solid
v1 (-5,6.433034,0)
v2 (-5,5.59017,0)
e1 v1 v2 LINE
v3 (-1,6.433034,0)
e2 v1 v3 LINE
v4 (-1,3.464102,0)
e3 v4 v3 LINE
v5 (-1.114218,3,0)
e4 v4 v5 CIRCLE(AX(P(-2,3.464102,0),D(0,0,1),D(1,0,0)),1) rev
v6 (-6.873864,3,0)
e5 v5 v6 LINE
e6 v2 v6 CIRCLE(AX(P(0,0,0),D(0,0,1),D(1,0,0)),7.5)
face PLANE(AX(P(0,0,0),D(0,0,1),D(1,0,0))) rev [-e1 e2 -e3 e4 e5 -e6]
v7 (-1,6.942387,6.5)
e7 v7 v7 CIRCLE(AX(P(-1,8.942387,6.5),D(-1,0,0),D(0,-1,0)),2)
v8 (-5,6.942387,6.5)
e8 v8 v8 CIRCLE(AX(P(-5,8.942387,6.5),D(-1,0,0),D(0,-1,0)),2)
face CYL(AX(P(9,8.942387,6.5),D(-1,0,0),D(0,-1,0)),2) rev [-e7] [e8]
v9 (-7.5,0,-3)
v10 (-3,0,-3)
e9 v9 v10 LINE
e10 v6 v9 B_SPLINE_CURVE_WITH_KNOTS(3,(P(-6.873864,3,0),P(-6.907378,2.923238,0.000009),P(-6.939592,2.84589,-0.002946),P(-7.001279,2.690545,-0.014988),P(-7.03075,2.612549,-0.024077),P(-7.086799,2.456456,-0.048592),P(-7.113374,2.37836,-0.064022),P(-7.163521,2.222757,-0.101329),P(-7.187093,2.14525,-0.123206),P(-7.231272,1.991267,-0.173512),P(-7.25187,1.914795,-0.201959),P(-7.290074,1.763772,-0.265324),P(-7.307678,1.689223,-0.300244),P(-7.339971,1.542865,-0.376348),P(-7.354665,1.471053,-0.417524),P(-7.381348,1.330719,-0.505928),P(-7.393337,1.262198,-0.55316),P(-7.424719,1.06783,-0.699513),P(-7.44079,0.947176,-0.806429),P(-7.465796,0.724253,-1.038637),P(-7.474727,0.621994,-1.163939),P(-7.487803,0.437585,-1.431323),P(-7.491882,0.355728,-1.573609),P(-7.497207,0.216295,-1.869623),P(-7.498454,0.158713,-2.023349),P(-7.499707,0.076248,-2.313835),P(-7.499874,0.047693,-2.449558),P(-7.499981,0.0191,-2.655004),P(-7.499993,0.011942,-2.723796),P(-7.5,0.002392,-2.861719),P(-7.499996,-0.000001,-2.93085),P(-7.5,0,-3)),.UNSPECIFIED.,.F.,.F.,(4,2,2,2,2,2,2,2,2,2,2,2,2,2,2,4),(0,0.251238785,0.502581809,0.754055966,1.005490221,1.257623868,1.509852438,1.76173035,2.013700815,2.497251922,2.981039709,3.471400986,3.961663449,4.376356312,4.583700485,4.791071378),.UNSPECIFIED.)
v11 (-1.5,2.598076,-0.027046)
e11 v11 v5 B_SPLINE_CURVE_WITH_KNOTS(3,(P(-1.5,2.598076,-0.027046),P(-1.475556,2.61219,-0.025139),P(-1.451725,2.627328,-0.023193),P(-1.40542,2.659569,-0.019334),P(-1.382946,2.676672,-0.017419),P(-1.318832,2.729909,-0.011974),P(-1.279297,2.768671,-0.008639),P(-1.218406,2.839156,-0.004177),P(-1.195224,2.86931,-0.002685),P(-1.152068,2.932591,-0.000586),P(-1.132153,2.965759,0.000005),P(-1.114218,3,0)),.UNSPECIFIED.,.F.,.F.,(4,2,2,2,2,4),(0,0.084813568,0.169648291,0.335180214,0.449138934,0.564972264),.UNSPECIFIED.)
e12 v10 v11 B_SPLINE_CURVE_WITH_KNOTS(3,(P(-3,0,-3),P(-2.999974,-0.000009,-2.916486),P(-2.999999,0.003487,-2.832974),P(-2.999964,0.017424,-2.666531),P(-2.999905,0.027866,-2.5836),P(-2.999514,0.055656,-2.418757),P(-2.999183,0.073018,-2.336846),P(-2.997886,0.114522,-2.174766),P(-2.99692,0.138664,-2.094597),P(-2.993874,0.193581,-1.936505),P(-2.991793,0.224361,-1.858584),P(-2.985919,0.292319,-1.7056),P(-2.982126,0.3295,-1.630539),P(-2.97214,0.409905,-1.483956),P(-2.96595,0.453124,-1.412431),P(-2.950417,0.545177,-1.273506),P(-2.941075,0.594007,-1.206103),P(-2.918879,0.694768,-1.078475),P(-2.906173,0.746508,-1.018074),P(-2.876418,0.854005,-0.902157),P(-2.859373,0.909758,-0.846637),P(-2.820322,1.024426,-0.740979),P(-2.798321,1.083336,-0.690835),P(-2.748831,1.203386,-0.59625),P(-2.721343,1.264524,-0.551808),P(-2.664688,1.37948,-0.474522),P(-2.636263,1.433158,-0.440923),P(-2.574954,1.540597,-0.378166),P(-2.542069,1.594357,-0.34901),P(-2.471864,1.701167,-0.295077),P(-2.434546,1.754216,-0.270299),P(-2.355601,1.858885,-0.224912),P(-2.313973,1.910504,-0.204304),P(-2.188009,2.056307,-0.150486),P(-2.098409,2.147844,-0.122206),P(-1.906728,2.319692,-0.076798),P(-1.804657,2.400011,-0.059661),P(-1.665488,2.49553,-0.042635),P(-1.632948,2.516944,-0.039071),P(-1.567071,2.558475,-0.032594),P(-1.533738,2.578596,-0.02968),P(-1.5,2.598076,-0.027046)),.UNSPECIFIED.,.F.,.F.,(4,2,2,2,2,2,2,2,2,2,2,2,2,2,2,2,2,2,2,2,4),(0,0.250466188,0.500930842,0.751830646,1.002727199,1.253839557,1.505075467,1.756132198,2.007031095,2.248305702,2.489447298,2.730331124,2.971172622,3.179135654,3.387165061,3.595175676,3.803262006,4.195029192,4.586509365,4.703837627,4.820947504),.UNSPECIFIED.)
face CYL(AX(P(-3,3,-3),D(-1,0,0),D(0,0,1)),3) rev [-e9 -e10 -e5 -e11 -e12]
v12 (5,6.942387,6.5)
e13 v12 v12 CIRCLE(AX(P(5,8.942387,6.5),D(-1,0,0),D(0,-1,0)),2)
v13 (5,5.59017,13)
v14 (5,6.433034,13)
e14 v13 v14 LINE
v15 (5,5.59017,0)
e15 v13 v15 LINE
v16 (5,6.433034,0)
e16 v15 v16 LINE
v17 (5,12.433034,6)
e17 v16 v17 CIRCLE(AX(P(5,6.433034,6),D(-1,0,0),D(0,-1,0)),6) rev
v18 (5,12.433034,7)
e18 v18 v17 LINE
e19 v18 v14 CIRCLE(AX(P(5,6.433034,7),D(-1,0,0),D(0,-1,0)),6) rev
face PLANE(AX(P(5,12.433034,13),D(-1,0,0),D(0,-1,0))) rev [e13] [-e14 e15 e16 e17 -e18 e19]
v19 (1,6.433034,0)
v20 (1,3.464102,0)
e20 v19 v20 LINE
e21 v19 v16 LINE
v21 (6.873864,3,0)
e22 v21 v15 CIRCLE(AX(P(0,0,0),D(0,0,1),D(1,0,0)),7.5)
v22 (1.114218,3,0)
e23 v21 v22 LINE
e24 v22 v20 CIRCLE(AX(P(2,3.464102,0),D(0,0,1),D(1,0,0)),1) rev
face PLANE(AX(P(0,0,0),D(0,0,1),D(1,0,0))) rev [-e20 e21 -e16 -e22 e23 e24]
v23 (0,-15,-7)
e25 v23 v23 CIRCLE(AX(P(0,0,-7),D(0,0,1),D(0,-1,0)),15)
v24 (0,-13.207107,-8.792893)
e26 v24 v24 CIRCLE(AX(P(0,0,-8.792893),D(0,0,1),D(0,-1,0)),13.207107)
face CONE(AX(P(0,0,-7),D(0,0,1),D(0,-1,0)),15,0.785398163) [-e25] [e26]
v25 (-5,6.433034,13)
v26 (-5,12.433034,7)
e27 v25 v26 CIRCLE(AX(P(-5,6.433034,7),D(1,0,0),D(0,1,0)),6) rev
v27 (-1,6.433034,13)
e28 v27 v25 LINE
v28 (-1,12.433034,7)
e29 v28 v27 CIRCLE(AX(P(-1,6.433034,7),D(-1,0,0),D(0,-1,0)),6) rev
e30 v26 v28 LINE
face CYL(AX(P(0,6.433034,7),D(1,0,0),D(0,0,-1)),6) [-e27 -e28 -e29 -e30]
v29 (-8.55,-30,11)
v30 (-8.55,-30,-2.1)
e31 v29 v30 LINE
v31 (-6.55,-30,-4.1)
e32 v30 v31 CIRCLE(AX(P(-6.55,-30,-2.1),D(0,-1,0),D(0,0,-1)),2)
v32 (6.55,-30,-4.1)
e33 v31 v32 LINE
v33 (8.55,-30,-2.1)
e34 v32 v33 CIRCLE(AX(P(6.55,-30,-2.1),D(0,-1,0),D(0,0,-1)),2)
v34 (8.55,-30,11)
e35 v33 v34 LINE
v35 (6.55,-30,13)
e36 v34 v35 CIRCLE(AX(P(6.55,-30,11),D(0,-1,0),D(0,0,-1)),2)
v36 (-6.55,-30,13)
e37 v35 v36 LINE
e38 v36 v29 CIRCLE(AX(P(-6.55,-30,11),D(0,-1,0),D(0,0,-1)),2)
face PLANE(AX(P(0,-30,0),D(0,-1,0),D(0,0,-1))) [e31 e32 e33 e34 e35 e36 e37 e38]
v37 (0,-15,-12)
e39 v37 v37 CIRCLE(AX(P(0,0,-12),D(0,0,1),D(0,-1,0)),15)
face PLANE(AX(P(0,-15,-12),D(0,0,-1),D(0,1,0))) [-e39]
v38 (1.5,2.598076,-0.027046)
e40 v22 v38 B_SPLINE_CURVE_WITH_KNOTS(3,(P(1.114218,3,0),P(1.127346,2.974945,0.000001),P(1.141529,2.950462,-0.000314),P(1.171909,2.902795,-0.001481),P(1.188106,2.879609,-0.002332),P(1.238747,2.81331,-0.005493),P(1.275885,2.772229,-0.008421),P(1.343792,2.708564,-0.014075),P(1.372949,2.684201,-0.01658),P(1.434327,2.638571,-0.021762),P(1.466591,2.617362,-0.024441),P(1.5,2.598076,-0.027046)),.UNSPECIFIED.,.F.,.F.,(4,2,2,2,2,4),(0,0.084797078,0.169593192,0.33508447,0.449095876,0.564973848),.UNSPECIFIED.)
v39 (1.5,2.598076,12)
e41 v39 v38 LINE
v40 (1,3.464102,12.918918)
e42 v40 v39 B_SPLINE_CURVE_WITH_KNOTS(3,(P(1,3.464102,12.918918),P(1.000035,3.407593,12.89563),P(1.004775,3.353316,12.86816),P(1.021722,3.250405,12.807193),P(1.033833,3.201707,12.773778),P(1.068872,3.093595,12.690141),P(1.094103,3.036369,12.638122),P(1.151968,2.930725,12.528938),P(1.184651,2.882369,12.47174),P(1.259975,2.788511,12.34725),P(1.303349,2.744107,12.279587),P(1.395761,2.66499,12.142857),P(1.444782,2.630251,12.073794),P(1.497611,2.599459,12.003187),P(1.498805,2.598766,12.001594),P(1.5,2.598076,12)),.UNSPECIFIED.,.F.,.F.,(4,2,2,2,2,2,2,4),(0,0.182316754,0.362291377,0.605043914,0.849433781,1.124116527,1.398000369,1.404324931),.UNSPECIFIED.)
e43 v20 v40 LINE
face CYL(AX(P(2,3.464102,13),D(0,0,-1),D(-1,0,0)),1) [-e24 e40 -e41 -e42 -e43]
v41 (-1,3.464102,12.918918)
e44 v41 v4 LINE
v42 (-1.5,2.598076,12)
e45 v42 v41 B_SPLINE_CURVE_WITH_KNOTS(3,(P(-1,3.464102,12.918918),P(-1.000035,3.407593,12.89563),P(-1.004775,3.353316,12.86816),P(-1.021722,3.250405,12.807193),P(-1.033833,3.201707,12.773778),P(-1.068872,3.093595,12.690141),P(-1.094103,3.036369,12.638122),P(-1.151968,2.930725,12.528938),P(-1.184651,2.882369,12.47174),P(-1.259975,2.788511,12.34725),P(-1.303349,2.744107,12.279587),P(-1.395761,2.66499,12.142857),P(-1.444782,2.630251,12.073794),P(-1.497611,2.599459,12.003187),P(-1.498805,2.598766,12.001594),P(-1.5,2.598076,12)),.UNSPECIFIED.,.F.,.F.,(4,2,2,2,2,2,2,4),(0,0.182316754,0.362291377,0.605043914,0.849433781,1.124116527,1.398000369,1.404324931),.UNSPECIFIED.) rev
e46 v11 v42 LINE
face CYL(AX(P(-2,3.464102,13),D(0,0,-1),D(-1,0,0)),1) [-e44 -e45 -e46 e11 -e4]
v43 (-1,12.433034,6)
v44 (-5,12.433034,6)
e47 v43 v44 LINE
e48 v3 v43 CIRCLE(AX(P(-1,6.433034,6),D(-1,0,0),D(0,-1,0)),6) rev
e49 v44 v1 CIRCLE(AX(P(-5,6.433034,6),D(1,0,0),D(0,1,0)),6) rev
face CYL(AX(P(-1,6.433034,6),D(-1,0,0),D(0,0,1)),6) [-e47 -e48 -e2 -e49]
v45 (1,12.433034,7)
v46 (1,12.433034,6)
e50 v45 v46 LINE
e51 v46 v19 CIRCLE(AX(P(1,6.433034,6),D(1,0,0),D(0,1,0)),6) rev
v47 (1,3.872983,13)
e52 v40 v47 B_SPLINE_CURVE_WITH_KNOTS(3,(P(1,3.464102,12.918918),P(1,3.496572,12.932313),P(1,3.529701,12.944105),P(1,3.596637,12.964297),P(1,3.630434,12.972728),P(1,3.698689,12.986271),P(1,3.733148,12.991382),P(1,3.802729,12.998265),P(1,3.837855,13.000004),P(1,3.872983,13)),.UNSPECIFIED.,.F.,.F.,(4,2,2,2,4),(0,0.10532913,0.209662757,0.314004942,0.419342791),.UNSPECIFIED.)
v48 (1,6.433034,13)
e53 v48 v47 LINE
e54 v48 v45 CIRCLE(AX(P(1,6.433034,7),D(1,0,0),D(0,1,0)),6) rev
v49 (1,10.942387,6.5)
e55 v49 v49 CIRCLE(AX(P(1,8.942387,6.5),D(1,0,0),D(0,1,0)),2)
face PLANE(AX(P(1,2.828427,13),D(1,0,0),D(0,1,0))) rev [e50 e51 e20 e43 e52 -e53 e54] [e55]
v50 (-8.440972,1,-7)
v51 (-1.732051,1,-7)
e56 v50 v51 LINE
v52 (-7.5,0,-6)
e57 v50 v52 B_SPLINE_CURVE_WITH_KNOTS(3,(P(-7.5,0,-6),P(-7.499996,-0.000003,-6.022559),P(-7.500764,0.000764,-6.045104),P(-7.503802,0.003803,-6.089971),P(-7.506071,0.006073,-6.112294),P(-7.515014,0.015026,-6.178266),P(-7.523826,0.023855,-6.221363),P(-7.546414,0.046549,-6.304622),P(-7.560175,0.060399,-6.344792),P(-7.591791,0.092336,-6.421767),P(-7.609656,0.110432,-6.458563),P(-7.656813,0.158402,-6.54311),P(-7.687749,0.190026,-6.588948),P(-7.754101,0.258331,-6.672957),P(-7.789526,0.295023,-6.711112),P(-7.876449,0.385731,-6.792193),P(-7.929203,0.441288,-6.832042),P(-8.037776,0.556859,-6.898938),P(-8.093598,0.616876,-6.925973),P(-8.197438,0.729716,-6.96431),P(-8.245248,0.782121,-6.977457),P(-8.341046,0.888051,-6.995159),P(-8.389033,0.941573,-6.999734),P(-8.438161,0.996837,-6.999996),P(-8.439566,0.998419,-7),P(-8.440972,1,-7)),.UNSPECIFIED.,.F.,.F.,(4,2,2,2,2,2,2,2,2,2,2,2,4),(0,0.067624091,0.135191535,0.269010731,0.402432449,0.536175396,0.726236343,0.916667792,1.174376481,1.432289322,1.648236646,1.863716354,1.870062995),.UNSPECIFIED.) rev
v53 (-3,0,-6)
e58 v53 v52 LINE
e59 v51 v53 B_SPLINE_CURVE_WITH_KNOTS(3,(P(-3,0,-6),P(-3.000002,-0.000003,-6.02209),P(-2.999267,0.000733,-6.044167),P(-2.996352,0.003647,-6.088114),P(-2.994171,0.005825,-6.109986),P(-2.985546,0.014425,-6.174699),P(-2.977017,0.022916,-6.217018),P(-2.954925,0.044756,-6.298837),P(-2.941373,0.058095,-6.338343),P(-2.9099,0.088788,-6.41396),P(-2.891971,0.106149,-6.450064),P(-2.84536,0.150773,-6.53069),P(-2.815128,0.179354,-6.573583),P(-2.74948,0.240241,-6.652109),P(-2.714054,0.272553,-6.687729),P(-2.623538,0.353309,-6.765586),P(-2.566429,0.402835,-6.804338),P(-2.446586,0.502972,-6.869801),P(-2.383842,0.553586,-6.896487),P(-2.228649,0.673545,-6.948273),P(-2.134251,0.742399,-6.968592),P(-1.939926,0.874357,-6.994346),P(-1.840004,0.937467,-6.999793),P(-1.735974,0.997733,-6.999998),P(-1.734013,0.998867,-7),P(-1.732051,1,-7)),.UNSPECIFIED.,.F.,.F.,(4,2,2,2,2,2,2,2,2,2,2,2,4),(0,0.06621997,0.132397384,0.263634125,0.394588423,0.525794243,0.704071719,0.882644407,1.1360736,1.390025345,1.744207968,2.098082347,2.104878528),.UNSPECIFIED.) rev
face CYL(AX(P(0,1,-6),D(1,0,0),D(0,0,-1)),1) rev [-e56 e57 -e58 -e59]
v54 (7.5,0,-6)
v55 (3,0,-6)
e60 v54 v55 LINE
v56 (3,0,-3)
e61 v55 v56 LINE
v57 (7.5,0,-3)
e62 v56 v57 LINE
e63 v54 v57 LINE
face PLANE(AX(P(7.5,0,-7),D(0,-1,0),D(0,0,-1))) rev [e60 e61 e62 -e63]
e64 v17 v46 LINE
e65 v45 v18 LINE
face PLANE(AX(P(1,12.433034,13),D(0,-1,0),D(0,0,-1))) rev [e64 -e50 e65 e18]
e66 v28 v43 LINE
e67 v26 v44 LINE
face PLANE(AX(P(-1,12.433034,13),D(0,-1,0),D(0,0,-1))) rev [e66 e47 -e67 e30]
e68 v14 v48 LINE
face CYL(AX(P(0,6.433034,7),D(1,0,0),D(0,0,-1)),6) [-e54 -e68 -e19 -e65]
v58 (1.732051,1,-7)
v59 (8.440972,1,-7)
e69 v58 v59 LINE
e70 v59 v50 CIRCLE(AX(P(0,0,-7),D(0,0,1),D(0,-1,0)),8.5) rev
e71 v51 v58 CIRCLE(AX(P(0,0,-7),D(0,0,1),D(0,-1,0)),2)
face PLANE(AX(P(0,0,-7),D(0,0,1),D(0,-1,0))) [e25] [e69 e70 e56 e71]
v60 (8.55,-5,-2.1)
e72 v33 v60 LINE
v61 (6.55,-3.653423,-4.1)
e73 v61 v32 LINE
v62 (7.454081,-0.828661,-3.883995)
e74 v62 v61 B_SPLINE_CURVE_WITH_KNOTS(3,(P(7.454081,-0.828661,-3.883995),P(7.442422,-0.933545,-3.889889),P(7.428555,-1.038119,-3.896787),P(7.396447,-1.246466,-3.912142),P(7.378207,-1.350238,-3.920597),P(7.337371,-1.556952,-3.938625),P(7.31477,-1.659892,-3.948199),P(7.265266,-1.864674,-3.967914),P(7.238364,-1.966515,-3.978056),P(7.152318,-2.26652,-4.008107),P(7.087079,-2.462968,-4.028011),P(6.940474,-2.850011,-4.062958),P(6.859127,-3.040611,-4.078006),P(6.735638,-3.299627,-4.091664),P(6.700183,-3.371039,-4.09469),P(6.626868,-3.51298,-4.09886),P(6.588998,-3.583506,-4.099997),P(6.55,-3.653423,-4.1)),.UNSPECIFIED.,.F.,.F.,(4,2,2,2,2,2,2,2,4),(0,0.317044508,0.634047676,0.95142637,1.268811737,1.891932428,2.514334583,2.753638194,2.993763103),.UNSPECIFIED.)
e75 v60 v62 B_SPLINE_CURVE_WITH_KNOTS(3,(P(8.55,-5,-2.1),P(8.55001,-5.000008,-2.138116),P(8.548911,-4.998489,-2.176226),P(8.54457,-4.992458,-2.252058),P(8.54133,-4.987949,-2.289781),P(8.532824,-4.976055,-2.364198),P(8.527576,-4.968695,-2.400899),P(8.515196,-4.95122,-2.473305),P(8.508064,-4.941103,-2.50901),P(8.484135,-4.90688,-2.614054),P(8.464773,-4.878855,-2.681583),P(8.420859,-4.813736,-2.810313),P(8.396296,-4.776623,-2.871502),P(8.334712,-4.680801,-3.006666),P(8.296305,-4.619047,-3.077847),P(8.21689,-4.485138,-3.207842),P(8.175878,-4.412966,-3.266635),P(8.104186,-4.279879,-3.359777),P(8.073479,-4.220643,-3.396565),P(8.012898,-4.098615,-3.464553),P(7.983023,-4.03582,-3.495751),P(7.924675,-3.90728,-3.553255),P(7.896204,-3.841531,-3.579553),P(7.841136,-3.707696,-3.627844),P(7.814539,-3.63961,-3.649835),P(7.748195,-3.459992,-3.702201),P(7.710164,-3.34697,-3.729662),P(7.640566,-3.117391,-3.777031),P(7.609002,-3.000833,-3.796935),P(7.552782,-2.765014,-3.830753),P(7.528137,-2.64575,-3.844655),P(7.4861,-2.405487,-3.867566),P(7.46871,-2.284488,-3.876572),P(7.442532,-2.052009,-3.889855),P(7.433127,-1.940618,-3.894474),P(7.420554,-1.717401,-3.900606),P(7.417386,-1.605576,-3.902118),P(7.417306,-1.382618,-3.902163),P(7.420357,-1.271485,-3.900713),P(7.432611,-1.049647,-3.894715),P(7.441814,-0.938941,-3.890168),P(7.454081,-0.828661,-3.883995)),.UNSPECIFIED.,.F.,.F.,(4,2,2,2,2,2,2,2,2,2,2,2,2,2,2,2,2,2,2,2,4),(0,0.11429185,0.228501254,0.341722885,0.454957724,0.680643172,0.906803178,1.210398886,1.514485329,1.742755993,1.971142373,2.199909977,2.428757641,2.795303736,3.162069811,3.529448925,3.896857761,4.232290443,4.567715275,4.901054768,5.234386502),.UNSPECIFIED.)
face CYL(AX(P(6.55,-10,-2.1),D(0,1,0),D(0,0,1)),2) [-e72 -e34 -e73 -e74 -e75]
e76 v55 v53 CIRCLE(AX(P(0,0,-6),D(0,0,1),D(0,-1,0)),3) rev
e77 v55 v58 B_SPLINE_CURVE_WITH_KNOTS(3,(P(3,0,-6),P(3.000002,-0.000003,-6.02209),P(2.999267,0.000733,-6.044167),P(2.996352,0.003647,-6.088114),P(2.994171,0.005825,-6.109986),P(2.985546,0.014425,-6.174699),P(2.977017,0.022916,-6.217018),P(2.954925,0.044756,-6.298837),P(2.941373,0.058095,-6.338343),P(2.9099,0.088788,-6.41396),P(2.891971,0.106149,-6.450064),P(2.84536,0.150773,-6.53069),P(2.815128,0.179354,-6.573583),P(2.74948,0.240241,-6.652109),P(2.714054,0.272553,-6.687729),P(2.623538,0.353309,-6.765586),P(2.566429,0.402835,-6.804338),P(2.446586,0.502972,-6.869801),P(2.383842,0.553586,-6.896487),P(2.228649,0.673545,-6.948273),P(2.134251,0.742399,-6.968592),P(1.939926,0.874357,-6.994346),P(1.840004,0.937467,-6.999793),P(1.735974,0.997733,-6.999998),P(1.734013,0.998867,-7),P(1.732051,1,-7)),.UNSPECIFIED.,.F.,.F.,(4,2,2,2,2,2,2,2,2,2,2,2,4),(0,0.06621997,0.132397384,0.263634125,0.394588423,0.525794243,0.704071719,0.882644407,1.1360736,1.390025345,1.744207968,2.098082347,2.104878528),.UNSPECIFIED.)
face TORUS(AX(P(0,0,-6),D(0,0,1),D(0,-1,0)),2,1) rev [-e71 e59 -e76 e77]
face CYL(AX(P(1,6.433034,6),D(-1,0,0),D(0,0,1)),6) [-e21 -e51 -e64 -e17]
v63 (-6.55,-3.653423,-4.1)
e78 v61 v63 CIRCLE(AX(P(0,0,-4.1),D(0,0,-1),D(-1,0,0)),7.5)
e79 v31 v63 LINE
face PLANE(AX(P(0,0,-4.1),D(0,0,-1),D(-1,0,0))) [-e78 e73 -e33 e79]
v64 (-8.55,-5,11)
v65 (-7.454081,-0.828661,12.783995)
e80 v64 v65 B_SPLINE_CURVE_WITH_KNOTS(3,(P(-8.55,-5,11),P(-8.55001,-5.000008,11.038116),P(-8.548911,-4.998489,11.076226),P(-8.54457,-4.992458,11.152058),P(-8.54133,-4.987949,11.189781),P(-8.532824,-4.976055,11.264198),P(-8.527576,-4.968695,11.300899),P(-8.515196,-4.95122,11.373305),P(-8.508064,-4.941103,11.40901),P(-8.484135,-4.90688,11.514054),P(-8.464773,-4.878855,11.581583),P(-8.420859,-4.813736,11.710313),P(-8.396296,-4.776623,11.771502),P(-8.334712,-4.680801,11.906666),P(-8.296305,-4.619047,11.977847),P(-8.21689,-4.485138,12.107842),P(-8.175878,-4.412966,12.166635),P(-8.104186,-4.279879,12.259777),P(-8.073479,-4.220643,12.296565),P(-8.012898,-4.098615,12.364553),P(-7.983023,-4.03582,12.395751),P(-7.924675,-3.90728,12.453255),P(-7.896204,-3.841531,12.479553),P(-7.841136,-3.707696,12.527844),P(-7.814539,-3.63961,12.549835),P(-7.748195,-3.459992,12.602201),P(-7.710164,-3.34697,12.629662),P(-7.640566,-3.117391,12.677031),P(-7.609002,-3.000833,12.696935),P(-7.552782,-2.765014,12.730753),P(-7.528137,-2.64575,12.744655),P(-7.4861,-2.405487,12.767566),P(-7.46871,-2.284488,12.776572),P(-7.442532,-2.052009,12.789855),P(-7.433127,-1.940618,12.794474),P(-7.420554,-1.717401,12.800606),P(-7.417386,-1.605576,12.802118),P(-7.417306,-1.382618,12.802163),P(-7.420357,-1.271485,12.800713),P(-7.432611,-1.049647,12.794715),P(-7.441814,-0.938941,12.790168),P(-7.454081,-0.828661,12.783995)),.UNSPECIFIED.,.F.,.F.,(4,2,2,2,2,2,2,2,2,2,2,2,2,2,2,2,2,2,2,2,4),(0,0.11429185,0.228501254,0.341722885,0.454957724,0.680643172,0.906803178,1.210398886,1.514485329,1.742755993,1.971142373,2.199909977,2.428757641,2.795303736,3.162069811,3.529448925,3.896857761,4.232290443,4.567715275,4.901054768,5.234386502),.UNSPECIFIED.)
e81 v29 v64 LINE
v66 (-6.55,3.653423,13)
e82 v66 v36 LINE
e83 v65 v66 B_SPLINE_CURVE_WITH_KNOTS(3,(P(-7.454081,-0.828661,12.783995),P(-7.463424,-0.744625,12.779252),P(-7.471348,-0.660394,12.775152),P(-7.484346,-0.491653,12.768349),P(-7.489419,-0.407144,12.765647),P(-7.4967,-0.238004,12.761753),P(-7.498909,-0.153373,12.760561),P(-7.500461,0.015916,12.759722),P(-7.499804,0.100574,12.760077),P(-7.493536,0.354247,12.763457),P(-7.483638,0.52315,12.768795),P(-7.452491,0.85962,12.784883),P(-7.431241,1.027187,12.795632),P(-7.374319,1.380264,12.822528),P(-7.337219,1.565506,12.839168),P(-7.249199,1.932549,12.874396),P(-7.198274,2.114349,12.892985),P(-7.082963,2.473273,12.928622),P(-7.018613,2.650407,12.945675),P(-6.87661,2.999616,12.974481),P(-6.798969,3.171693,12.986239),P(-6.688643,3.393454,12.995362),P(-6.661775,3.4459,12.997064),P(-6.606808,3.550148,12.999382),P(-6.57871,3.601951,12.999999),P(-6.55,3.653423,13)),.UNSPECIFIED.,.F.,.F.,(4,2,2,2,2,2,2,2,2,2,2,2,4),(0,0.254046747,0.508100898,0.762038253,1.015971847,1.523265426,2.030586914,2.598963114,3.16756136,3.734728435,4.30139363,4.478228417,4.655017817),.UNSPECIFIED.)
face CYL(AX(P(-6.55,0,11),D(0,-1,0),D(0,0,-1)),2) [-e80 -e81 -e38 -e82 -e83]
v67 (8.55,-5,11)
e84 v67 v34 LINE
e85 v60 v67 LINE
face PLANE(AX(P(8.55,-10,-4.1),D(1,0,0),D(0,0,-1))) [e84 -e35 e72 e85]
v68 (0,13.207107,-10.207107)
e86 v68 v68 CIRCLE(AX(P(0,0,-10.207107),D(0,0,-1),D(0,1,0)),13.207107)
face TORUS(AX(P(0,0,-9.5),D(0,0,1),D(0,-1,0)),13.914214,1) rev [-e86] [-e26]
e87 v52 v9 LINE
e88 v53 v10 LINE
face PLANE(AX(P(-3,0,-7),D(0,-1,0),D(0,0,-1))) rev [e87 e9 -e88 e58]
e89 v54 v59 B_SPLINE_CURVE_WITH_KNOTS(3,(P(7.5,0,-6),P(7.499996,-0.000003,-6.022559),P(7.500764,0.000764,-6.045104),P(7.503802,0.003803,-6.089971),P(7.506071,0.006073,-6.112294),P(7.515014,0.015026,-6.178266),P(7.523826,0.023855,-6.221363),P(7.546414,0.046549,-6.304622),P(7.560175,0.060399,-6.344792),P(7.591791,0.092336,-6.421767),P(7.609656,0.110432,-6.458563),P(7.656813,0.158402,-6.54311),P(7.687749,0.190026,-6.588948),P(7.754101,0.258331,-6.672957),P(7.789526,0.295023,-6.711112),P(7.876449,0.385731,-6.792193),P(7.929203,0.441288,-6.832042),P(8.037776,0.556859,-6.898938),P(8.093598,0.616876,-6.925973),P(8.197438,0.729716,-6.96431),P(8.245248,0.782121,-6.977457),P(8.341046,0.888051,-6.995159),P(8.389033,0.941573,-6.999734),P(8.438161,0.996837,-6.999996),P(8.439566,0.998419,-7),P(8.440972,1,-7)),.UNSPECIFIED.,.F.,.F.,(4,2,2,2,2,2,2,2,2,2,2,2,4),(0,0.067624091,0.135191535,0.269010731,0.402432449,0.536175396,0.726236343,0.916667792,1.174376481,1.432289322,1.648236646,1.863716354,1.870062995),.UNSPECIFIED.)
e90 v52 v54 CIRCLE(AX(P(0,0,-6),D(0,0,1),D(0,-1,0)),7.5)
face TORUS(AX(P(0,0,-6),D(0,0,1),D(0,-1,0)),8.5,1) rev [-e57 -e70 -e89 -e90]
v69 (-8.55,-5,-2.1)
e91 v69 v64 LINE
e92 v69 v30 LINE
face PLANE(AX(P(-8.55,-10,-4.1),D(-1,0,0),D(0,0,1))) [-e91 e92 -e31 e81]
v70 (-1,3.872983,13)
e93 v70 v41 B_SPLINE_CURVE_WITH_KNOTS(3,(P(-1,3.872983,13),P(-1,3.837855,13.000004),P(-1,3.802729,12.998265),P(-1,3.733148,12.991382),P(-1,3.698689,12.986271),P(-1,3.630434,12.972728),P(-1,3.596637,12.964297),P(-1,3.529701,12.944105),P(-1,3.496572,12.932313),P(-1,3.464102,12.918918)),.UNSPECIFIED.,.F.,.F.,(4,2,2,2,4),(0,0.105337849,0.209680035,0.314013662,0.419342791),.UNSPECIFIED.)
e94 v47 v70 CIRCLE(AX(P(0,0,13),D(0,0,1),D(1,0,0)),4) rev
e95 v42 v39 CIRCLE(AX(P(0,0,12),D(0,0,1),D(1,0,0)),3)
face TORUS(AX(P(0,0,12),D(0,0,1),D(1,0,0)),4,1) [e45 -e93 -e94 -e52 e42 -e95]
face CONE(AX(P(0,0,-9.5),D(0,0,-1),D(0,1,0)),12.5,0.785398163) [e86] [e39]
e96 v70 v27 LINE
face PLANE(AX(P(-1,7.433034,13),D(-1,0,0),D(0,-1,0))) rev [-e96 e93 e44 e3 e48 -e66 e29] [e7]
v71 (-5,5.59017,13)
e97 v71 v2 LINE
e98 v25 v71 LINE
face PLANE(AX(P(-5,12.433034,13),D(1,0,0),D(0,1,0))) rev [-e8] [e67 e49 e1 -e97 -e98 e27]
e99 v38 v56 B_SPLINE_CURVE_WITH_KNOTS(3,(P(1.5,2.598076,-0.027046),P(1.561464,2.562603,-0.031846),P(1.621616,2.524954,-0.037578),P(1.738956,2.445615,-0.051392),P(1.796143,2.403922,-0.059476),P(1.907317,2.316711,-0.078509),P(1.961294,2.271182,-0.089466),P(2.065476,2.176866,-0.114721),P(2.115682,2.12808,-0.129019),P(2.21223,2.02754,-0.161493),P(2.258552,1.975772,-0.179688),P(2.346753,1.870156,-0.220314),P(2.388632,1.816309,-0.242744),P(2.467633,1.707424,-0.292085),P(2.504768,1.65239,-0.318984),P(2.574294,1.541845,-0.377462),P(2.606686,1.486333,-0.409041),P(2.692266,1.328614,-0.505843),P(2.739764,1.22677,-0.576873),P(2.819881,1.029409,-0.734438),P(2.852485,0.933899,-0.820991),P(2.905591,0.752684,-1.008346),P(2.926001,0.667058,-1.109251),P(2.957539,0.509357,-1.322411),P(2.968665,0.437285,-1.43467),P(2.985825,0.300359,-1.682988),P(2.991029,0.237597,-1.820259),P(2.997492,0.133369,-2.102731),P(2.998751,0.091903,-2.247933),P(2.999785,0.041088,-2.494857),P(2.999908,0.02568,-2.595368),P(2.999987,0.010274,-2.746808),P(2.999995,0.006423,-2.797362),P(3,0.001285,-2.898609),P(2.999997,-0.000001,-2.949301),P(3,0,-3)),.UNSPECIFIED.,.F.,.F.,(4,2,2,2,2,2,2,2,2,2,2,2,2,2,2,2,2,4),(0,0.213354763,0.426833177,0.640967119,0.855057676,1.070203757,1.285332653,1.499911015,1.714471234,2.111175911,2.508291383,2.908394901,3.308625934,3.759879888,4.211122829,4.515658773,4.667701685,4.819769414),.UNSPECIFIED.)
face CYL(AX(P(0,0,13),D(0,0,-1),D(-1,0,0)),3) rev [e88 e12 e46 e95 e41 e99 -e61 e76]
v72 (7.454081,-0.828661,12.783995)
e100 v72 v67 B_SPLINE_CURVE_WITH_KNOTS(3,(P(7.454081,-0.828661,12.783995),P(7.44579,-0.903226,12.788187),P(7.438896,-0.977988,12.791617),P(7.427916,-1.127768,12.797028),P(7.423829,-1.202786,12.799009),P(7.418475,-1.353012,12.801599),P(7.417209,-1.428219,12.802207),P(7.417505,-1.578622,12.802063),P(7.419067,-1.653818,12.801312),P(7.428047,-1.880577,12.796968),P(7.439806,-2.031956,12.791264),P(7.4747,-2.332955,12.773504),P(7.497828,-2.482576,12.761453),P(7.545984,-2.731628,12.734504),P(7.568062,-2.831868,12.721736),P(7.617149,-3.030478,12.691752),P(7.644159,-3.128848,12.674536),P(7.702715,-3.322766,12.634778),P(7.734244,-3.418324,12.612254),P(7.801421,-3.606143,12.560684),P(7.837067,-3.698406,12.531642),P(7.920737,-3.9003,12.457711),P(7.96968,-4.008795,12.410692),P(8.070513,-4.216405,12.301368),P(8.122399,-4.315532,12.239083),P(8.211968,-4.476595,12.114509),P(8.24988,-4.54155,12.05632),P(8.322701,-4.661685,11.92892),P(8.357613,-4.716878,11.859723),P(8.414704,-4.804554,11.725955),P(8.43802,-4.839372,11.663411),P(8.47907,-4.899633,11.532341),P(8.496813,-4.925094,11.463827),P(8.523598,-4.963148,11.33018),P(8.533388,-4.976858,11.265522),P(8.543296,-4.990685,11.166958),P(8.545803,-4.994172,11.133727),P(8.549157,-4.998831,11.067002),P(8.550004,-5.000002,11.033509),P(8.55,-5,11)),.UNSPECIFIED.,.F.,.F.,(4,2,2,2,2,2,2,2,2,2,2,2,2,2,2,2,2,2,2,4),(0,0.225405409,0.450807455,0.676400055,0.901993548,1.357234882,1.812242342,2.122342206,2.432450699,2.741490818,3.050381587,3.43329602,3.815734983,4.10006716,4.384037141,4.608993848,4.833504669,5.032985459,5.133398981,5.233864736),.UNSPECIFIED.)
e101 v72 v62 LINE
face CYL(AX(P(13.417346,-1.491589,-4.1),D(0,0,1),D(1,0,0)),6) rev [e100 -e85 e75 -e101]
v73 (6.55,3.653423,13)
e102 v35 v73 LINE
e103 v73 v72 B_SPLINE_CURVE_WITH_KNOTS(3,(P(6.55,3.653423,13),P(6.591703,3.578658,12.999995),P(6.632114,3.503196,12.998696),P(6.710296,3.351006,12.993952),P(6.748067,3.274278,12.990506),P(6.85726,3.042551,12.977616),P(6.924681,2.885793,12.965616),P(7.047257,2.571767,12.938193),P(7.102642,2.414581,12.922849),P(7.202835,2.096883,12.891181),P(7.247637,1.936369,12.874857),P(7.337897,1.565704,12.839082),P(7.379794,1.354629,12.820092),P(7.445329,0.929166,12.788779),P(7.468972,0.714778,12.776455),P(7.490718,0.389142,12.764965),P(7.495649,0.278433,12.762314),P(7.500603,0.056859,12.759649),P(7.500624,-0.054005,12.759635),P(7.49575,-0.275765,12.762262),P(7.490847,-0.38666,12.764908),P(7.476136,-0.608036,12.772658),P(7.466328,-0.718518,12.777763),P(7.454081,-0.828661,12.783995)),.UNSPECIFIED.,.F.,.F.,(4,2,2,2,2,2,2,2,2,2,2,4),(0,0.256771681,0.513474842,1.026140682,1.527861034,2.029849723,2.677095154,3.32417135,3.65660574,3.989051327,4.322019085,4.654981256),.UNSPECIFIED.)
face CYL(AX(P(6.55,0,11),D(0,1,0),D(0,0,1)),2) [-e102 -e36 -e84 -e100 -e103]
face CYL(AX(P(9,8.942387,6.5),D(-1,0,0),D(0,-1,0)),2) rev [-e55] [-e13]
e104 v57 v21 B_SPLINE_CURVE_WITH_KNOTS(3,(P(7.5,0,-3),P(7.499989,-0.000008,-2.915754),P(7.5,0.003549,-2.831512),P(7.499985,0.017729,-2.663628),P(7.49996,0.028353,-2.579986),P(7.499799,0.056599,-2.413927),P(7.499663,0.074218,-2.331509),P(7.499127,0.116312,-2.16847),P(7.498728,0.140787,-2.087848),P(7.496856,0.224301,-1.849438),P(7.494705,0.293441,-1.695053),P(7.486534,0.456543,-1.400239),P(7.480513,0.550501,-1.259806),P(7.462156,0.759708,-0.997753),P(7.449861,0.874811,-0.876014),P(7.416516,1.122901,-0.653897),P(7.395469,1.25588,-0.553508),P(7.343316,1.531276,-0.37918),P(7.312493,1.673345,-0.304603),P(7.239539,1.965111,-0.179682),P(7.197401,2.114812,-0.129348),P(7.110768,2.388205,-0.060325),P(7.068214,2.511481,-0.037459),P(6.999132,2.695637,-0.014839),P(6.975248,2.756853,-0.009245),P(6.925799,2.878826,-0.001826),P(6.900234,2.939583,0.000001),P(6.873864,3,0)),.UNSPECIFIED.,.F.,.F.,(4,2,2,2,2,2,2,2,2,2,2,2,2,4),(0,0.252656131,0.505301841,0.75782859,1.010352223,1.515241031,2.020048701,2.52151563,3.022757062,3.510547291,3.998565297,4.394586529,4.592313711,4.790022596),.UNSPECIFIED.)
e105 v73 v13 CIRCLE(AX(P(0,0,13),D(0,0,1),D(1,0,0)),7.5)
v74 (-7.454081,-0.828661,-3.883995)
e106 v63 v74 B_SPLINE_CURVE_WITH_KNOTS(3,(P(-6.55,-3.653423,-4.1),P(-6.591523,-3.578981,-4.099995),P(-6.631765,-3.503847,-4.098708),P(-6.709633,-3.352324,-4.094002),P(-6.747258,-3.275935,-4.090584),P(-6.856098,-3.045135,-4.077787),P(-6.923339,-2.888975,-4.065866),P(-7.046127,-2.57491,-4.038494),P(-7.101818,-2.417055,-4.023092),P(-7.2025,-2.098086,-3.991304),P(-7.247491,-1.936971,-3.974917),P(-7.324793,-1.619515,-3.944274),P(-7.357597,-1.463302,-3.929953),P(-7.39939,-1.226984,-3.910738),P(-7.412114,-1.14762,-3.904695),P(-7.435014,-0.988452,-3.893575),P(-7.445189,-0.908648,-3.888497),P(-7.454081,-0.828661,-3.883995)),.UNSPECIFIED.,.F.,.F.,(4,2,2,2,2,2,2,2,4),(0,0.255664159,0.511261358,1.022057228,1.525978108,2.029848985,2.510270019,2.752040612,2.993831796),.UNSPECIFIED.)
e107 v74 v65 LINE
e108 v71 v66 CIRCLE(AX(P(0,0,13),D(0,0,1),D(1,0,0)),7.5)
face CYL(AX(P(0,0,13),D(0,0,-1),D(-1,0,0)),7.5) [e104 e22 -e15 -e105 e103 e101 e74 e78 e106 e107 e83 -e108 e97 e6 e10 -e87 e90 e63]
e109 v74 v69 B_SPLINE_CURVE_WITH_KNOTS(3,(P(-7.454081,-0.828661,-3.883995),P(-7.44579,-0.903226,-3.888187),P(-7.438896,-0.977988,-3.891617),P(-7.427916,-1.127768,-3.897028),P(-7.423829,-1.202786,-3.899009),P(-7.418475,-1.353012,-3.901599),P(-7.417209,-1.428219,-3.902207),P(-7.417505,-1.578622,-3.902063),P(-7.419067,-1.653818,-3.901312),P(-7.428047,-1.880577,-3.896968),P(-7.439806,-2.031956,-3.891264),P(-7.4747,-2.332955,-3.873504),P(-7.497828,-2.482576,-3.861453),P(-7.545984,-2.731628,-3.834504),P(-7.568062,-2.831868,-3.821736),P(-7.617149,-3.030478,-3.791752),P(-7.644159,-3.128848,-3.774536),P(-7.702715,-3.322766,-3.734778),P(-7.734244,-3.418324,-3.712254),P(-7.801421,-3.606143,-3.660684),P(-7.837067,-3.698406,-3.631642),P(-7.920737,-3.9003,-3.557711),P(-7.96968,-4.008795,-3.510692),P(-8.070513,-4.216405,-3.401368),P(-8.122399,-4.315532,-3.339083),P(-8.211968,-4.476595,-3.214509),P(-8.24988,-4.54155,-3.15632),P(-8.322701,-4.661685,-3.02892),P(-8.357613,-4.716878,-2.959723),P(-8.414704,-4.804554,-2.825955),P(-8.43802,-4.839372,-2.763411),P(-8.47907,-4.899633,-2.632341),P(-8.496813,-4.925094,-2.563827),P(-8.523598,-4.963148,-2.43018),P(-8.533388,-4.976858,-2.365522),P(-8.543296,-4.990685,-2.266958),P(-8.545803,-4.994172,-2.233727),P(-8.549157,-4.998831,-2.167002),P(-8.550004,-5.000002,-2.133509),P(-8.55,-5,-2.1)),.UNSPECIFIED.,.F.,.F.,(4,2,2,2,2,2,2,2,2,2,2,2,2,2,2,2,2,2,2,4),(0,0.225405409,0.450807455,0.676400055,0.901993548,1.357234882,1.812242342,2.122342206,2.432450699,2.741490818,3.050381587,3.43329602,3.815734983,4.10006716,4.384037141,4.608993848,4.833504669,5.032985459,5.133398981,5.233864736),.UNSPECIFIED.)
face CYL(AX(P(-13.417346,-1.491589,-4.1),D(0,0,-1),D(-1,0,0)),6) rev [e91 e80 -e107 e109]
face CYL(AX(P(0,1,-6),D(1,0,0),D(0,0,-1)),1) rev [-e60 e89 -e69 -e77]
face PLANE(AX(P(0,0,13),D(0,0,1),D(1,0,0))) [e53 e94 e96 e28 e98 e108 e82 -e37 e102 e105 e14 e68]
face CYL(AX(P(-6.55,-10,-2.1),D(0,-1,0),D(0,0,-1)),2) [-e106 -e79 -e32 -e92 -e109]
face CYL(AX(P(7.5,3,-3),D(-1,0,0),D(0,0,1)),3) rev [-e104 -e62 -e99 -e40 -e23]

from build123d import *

# Parameters (mm, degrees)
BOSS_EXTRUDE1_DEPTH = 13
FILLET1_R           = 1
FILLET2_R           = 6
BOSS_EXTRUDE2_START = 7
BOSS_EXTRUDE2_DEPTH = 7
SKETCH3_W           = 17.1
SKETCH3_H           = 5
BOSS_EXTRUDE3_DEPTH = 17.1
FILLET3_R           = 6
SKETCH4_W           = 17.1
SKETCH4_H           = 17.1
BOSS_EXTRUDE4_DEPTH = 20
FILLET4_R           = 2
FILLET6_R           = 1
FILLET7_R           = 1
SKETCH6_R           = 1.9999999999999987
CUT_EXTRUDE1_DEPTH  = 14.000000000000002
FILLET8_R           = 3


with BuildPart() as part:
    # Sketch1 → Boss-Extrude1 (new body)
    with BuildSketch(Plane.XY):
        with BuildLine():
            Line((-0.9999999999999998, 7.433034373659251), (-1.0000000000000002, 12.433034373659252))
            Line((-1.0000000000000002, 12.433034373659252), (-5, 12.433034373659252))
            Line((-5, 12.433034373659252), (-4.999999999999999, 5.590169943749475))
            ThreePointArc((-4.999999999999999, 5.590169943749475), (-1.38e-15, -7.5), (4.999999999999999, 5.5901699437494745))
            Line((4.999999999999999, 5.5901699437494745), (5, 12.433034373659252))
            Line((5, 12.433034373659252), (0.9999999999999998, 12.433034373659252))
            Line((0.9999999999999998, 12.433034373659252), (0.9999999999999993, 7.433034373659251))
            Line((0.9999999999999993, 7.433034373659251), (0.9999999999999998, 2.8284271247461907))
            ThreePointArc((0.9999999999999998, 2.8284271247461907), (-5.5e-16, -3.0000000000000004), (-1.0000000000000002, 2.8284271247461903))
            Line((-1.0000000000000002, 2.8284271247461903), (-0.9999999999999998, 7.433034373659251))
        make_face()
    extrude(amount=BOSS_EXTRUDE1_DEPTH)

    # Fillet1
    fillet1_edges = [part.edges().sort_by_distance(p)[0] for p in [
        (-1.0000000000000004, 2.8284271247461907, 6.5),
        (0.9999999999999998, 2.8284271247461907, 6.5),
        (-4.7e-16, -3.0000000000000004, 13),
    ]]
    fillet(fillet1_edges, radius=FILLET1_R)

    # Fillet2
    fillet2_edges = [part.edges().sort_by_distance(p)[0] for p in [
        (-3, 12.433034373659252, 13),
        (3, 12.433034373659252, 0),
        (-3, 12.433034373659252, 0),
        (3, 12.433034373659252, 13),
    ]]
    fillet(fillet2_edges, radius=FILLET2_R)

    # Sketch2 → Boss-Extrude2 (add)
    with BuildSketch(Plane(origin=(0, 0, 0), x_dir=(-1, 0, 0), z_dir=(0, 0, -1)).offset(BOSS_EXTRUDE2_START)):
        with BuildLine():
            Line((-7.5, 0), (-3.0000000000000004, 0))
            ThreePointArc((-3.0000000000000004, 0), (-5.5e-16, -3.0000000000000004), (3.0000000000000004, 0))
            Line((3.0000000000000004, 0), (7.5, 0))
            ThreePointArc((7.5, 0), (-1.38e-15, -7.5), (-7.5, 0))
        make_face()
    extrude(amount=-BOSS_EXTRUDE2_DEPTH)

    # Sketch3 → Boss-Extrude3 (add)
    with BuildSketch(Plane.XY.offset(13)):
        with Locations((1.78e-15, -7.5)):
            Rectangle(SKETCH3_W, SKETCH3_H)
    extrude(amount=-BOSS_EXTRUDE3_DEPTH)

    # Fillet3
    # the kernel refuses this fillet: 6 mm, written as the material it adds along each edge
    with BuildSketch(Plane(origin=(5.590169943749475, -5, 13), x_dir=(0.407962135259343, 0.9129988478605203, 0), z_dir=(0, 0, -1))) as fillet3_piece_1:
        with BuildLine():
            CenterArc((6.396366403246306, 5.714903515427595), FILLET3_R, 210.13883458163096, 42.12773397862901)
            Line((1.2074985897527464, 2.70232143121967), (1.1037212334828754, 2.642069789535512))
            ThreePointArc((1.1037212334828754, 2.642069789535512), (0.4941894331331104, 1.4001161718409558), (-0.10955986174326253, 0.0489554562311212))
            Line((-0.10955986174326253, 0.0489554562311212), (0.03655066516140769, -0.11429807030855153))
            ThreePointArc((0.03655066516140769, -0.11429807030855153), (2.2844165725879635, 0.23637060571550603), (4.5322824800145245, -0.11429807030855171))
            Line((4.5322824800145245, -0.11429807030855171), (4.568833145175932, -9e-17))
        make_face()
    extrude(amount=17.1)
    with BuildSketch(Plane(origin=(-5.590169943749474, -5, 13), x_dir=(-0.40796213525934283, 0.9129988478605204, 0), z_dir=(0, 0, -1))) as fillet3_piece_2:
        with BuildLine():
            CenterArc((6.396366403246302, -5.714903515427596), FILLET3_R, 107.73343143974, 42.12773397862901)
            Line((1.2074985897527435, -2.702321431219668), (1.1037212334828725, -2.642069789535509))
            ThreePointArc((1.1037212334828725, -2.642069789535509), (0.4941894331331094, -1.4001161718409545), (-0.10955986174326254, -0.04895545623112119))
            Line((-0.10955986174326254, -0.04895545623112119), (0.03655066516140771, 0.11429807030855152))
            ThreePointArc((0.03655066516140771, 0.11429807030855152), (2.284416572587965, -0.23637060571550497), (4.532282480014523, 0.11429807030855221))
            Line((4.532282480014523, 0.11429807030855221), (4.56883314517593, 0))
        make_face()
    extrude(amount=17.1)

    # Sketch4 → Boss-Extrude4 (add)
    with BuildSketch(Plane.XZ.offset(10)):
        with Locations((1.78e-15, 4.45)):
            Rectangle(SKETCH4_W, SKETCH4_H)
    extrude(amount=BOSS_EXTRUDE4_DEPTH)

    # Fillet4
    fillet4_edges = [part.edges().sort_by_distance(p)[0] for p in [
        (8.549999999999962, -17.499999999999645, 13),
        (8.549999999999962, -17.499999999999645, -4.100000000000001),
        (-8.54999999999996, -17.499999999999645, 13),
        (-8.54999999999996, -17.499999999999645, -4.100000000000001),
    ]]
    fillet(fillet4_edges, radius=FILLET4_R)

    # Sketch5 → Revolve1 (revolve)
    with BuildSketch(Plane(origin=(0, 0, 0), x_dir=(0, 0, -1), z_dir=(1, 0, 0))):
        Polygon((6.999999999999999, -8.7e-16), (7.000000000000001, -15), (9.499999999999998, -12.5), (12, -15), (12, 0), align=None)
    revolve(axis=Axis((0, 0, 0), (0, -1.2e-16, -1)))

    # Fillet6
    fillet6_edges = [part.edges().sort_by_distance(p)[0] for p in [
        (4.1e-16, -3, -7),
        (5.25, 0, -7),
        (-1.01e-15, -7.499999999999999, -7),
        (-5.25, 0, -7),
    ]]
    fillet(fillet6_edges, radius=FILLET6_R)

    # Fillet7
    fillet7_edges = [part.edges().sort_by_distance(p)[0] for p in [
        (-1.53e-15, 12.499999999999996, -9.500000000000002),
    ]]
    fillet(fillet7_edges, radius=FILLET7_R)

    # Sketch6 → Cut-Extrude1 (cut)
    with BuildSketch(Plane.ZY.offset(4.999999999999998)):
        with Locations(Location((6.500000000000002, 8.942387299959254, 0), (0, 0, 270))):
            Circle(SKETCH6_R)
    extrude(amount=-CUT_EXTRUDE1_DEPTH, mode=Mode.SUBTRACT)

    # Fillet8
    fillet8_edges = [part.edges().sort_by_distance(p)[0] for p in [
        (5.25, 0, 0),
        (-5.25, 0, 0),
    ]]
    fillet(fillet8_edges, radius=FILLET8_R)


solid = part.part
